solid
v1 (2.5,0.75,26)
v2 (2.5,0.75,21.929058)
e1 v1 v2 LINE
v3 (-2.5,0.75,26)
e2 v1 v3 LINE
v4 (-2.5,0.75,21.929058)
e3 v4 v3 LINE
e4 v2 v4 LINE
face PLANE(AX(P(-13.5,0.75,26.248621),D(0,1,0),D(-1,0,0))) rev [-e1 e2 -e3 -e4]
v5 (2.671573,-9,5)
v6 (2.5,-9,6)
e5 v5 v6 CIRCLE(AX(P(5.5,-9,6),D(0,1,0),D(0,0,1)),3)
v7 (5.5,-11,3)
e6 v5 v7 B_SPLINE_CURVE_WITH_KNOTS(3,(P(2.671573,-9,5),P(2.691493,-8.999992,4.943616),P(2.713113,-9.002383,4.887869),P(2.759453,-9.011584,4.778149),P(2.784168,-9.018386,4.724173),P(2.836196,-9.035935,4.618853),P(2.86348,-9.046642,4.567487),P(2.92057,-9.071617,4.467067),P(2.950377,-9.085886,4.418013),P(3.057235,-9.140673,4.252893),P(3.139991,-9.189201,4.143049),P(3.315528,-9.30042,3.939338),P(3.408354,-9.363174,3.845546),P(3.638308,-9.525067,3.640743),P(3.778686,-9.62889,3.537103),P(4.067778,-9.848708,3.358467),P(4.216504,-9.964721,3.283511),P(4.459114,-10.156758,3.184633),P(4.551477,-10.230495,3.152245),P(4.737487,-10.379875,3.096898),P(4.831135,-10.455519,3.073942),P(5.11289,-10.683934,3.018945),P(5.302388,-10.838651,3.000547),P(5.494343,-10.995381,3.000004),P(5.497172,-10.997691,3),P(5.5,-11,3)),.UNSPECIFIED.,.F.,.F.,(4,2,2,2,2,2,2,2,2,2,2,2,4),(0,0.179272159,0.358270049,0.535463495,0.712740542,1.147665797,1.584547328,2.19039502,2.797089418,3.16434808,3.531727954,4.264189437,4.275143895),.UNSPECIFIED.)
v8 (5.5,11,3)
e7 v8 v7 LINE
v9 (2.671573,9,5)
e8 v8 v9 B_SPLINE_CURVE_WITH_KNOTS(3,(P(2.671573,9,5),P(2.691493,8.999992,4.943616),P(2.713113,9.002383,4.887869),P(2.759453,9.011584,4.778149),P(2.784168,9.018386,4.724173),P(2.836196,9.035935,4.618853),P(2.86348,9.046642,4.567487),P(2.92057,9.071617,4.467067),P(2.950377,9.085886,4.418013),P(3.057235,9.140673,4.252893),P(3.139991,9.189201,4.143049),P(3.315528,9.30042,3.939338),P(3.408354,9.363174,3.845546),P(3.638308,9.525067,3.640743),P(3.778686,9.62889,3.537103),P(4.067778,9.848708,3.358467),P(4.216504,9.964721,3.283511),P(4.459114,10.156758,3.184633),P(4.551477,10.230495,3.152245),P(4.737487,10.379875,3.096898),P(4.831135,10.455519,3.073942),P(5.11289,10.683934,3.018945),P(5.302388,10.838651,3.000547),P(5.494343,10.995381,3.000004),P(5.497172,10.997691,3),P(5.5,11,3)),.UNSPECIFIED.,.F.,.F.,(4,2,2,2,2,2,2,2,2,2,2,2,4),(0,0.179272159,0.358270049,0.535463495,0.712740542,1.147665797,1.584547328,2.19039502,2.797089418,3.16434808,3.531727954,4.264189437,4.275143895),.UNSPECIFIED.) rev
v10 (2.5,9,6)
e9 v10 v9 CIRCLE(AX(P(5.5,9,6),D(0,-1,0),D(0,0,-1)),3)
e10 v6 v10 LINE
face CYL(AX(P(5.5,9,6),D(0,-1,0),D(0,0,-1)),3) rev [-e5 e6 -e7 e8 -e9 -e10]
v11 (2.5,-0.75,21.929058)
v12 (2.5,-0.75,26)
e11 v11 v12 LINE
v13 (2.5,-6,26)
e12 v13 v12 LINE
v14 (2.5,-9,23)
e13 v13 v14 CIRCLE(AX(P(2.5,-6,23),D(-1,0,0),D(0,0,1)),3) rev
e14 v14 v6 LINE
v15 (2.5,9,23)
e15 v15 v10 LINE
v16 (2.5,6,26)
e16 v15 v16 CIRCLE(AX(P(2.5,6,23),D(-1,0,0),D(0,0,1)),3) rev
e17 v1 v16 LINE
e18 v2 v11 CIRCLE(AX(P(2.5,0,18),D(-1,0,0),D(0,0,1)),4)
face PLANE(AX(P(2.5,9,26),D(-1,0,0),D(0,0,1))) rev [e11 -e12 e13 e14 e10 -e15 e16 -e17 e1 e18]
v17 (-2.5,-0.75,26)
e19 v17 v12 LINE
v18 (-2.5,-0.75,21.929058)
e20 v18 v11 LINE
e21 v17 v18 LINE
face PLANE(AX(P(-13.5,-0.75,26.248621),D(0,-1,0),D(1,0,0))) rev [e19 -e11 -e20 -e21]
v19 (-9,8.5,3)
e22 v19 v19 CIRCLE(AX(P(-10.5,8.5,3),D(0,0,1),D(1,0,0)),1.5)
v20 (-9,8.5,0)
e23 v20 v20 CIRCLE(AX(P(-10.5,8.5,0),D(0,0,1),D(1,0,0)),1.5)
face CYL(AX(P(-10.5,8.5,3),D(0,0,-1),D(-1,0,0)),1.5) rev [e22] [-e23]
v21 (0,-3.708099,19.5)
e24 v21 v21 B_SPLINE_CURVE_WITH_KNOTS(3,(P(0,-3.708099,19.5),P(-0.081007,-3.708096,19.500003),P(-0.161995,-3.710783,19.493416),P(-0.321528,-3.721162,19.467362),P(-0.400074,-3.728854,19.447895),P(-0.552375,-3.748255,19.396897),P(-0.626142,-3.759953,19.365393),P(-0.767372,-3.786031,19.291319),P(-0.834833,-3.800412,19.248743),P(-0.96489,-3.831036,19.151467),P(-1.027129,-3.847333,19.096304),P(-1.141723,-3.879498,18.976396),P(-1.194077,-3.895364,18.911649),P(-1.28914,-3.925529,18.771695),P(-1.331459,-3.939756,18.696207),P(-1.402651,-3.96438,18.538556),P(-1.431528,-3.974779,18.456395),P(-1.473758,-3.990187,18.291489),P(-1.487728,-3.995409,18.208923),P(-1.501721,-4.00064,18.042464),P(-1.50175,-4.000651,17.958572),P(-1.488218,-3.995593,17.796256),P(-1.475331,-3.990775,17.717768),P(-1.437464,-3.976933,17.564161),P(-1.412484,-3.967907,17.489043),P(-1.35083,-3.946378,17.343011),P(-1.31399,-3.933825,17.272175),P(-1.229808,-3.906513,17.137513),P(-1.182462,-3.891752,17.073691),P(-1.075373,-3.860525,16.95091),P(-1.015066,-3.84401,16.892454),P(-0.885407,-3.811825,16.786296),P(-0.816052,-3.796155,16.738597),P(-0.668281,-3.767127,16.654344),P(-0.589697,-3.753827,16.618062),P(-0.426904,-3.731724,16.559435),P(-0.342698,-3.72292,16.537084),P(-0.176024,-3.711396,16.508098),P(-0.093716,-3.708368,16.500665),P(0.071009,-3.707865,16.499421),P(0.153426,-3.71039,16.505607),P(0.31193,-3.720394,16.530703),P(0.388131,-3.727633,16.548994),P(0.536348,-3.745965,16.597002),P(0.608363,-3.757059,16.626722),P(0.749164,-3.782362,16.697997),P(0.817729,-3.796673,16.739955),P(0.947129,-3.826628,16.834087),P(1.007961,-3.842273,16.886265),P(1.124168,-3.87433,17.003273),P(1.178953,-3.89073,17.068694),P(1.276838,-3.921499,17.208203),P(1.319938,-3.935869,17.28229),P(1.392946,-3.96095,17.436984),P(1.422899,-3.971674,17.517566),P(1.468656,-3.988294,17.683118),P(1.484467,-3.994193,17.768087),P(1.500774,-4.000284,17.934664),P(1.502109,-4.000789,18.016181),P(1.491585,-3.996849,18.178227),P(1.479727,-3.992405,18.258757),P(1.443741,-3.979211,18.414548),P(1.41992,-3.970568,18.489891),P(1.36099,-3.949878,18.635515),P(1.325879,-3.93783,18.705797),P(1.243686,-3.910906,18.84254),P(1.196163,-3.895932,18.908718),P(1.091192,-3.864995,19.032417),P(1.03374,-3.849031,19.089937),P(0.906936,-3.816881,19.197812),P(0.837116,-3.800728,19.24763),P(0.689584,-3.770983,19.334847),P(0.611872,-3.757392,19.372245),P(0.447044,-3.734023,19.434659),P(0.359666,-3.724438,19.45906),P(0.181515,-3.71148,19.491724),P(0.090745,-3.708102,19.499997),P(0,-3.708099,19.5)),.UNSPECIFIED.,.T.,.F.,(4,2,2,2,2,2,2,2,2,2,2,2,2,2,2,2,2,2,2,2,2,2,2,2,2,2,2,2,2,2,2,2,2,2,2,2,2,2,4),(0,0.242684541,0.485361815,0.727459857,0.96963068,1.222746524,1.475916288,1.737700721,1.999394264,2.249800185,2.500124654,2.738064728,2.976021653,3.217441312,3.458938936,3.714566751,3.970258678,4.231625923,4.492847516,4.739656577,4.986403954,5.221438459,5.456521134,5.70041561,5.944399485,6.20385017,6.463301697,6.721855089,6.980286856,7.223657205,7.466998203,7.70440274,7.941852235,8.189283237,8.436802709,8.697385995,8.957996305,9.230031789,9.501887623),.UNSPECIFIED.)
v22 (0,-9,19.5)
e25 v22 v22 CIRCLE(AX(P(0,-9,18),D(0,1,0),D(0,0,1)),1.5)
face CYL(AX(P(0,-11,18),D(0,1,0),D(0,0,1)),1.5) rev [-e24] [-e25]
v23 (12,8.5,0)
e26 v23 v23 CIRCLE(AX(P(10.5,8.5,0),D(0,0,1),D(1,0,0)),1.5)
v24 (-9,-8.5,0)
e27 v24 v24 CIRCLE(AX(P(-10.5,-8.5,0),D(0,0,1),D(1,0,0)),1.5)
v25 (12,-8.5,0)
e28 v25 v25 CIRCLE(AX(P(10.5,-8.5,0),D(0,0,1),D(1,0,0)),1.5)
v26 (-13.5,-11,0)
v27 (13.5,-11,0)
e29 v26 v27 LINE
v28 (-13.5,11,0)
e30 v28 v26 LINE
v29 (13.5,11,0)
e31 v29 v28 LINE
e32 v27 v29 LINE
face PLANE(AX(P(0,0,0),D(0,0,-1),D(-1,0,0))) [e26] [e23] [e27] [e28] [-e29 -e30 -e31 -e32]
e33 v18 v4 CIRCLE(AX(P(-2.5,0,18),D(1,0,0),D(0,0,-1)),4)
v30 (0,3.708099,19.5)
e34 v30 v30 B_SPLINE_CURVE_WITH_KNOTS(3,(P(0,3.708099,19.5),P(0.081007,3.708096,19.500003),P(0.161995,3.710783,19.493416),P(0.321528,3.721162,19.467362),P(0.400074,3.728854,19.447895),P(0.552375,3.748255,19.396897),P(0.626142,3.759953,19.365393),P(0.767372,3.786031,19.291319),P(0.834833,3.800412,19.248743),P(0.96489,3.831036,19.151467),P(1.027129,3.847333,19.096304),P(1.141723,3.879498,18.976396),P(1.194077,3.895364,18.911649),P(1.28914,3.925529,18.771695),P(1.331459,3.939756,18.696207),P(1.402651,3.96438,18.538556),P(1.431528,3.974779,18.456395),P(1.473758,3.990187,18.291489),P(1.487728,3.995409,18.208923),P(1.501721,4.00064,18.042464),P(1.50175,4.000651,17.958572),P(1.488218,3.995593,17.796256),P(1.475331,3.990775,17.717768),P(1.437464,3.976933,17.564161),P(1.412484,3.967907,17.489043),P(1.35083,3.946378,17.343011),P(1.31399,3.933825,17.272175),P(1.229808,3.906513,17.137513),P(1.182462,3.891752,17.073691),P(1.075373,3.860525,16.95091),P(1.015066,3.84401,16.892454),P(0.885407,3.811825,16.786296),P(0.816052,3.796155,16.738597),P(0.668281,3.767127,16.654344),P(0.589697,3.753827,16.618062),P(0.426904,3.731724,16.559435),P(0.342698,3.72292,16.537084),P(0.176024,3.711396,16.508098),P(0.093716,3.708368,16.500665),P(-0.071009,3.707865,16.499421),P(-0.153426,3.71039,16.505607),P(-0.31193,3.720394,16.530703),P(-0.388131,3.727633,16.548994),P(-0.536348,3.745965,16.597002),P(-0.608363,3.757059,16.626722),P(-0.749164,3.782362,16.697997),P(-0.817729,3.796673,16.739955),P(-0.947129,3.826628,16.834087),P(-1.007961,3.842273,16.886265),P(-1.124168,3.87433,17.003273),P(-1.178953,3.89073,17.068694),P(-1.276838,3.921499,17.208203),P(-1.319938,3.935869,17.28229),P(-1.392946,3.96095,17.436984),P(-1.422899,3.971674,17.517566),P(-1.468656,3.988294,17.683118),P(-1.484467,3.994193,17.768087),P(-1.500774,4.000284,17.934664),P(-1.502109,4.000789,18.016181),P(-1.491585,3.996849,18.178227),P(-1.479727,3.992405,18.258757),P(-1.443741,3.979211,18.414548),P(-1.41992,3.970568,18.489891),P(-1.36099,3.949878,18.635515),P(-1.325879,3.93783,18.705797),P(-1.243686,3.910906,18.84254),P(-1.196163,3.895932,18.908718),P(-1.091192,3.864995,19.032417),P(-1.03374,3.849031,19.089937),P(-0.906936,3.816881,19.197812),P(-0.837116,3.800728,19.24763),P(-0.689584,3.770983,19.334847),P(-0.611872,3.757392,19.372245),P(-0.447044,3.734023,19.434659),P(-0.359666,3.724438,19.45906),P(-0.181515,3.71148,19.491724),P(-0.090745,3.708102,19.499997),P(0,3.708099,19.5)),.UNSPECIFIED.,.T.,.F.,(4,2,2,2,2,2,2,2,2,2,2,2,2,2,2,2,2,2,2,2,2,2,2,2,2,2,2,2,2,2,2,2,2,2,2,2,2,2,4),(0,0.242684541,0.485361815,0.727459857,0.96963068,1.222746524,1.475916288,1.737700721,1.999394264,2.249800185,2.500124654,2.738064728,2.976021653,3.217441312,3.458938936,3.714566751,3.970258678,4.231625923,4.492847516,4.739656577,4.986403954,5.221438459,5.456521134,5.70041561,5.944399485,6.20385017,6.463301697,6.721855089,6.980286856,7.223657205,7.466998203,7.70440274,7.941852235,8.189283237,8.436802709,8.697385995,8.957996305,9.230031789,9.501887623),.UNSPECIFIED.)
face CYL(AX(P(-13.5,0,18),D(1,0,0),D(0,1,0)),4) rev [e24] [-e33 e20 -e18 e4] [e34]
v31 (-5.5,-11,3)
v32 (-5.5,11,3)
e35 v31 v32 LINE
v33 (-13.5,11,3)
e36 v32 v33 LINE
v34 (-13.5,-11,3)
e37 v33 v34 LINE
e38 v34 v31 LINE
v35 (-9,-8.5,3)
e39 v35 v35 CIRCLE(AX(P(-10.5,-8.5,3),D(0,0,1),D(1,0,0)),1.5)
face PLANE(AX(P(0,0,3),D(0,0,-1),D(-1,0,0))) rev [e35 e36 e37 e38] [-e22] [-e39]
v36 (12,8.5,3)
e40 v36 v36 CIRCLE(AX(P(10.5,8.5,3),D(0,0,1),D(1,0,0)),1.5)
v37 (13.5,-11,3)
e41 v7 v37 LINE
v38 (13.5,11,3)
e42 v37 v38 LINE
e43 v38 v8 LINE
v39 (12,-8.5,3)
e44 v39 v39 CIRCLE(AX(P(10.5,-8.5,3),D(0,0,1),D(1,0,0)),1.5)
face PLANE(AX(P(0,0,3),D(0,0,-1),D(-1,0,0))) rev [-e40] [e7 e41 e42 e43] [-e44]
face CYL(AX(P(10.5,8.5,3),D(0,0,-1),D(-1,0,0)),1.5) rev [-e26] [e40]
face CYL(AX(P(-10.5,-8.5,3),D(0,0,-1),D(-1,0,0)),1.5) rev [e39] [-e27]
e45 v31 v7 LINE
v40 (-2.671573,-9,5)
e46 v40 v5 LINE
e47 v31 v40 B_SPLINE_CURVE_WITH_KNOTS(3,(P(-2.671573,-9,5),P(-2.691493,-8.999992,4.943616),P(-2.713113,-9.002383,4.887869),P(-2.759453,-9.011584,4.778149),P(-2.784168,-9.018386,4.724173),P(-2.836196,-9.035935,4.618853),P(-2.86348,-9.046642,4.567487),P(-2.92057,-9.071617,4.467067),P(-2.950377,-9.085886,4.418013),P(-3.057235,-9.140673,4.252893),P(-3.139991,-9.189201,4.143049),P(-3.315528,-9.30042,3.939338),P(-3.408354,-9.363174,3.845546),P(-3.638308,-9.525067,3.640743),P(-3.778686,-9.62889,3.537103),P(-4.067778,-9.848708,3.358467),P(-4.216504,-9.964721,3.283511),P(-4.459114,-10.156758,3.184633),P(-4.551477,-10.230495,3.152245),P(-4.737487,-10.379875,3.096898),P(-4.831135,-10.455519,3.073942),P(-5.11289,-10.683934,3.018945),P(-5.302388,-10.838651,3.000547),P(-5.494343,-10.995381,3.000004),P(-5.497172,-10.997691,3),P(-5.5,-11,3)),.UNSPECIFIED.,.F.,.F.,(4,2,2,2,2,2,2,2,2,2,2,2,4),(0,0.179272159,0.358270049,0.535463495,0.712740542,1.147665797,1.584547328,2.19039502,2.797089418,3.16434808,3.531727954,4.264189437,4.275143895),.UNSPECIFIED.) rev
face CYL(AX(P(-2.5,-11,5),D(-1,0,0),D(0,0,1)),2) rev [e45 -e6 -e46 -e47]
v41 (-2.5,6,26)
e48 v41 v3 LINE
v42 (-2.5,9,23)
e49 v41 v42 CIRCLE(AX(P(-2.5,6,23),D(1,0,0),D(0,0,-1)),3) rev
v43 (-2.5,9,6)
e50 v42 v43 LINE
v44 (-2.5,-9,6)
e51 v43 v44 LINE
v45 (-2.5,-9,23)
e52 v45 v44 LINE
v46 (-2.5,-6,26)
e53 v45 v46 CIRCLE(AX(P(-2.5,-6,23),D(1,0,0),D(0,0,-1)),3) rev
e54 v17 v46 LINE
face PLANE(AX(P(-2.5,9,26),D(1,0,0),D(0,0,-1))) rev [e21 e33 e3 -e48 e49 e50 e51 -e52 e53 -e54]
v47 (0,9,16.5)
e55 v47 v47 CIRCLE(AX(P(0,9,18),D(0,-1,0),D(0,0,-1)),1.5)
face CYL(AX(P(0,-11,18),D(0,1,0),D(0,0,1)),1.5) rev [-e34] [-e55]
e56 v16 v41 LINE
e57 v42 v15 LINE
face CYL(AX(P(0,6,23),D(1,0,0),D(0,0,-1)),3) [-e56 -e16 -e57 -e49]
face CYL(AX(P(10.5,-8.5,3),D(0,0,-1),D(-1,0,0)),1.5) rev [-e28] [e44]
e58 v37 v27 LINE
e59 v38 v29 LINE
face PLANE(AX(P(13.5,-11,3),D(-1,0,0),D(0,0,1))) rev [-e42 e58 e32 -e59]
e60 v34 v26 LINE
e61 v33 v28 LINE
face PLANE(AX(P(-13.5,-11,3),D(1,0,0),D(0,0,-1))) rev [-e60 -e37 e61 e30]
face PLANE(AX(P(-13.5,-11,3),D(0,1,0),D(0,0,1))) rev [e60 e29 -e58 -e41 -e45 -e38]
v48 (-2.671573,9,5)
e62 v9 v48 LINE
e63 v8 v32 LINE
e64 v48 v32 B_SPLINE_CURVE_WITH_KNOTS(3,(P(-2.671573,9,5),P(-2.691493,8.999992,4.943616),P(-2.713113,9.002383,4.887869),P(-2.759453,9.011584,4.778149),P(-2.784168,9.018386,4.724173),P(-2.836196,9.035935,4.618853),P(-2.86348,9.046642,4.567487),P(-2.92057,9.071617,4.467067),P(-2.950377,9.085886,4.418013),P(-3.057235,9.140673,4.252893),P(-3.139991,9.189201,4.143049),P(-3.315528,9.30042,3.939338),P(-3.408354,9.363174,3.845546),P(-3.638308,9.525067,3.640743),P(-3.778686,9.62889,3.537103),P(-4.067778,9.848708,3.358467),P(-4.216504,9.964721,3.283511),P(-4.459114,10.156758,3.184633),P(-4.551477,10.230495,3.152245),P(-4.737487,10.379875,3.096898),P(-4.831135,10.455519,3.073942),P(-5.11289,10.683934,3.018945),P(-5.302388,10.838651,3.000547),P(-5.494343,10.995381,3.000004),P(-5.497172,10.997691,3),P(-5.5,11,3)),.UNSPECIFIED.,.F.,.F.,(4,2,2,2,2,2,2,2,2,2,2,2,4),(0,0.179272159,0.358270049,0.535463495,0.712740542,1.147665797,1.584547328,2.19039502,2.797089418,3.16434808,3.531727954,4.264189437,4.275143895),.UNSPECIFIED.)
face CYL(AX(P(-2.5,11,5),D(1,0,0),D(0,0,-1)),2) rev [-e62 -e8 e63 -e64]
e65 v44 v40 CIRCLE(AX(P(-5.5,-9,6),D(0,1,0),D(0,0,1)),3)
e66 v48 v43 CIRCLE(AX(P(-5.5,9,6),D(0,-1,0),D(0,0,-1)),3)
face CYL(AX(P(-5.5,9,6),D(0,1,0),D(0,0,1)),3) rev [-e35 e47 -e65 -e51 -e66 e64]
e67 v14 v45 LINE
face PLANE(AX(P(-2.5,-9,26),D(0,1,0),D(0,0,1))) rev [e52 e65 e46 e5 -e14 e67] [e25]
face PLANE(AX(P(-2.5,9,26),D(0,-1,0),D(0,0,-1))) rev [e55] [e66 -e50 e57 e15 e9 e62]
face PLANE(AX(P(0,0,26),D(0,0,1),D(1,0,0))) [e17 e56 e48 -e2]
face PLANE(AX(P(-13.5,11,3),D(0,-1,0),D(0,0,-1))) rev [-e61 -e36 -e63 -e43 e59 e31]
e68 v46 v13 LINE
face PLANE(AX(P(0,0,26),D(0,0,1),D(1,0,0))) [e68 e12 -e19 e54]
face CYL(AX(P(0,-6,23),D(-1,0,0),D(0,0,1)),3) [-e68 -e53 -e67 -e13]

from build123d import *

# Parameters (mm, degrees)
SKETCH1_W               = 27
SKETCH1_H               = 22
SKETCH1_R               = 1.5
BOSS_EXTRUDE1_DEPTH     = 3
SKETCH2_W               = 5
SKETCH2_H               = 18
BOSS_EXTRUDE2_DEPTH     = 23
CUT_EXTRUDE1_DEPTH      = 33.449961479
CUT_EXTRUDE1_DEPTH_BACK = 33.449961479
SKETCH3_R               = 4
CUT_EXTRUDE2_DEPTH      = 33.449961479
CUT_EXTRUDE2_DEPTH_BACK = 33.449961479
SKETCH4_W               = 9.515030356
SKETCH4_H               = 1.5
FILLET1_R               = 3
CUT_EXTRUDE3_DEPTH      = 37.636730203
CUT_EXTRUDE3_DEPTH_BACK = 37.636730203
SKETCH5_R               = 1.5
FILLET2_R               = 2
FILLET3_R               = 3


with BuildPart() as part:
    # Sketch1 → Boss-Extrude1 (new body)
    with BuildSketch(Plane.XY):
        Rectangle(SKETCH1_W, SKETCH1_H)
        with Locations((-10.5, -8.5)):
            Circle(SKETCH1_R, mode=Mode.SUBTRACT)
        with Locations((-10.5, 8.5)):
            Circle(SKETCH1_R, mode=Mode.SUBTRACT)
        with Locations((10.5, 8.5)):
            Circle(SKETCH1_R, mode=Mode.SUBTRACT)
        with Locations((10.5, -8.5)):
            Circle(SKETCH1_R, mode=Mode.SUBTRACT)
    extrude(amount=BOSS_EXTRUDE1_DEPTH)

    # Sketch2 → Boss-Extrude2 (add)
    with BuildSketch(Plane.XY.offset(3)):
        Rectangle(SKETCH2_W, SKETCH2_H)
    extrude(amount=BOSS_EXTRUDE2_DEPTH)

    # Sketch3 → Cut-Extrude1 (cut, two sides: drawn at the far end of the back side and taken through both)
    with BuildSketch(Plane(origin=(2.5, 0, 0), x_dir=(0, 0, -1), z_dir=(1, 0, 0)).offset(-CUT_EXTRUDE1_DEPTH_BACK)):
        with Locations(Location((-18, 0, 0), (0, 0, 180))):
            Circle(SKETCH3_R)
    extrude(amount=CUT_EXTRUDE1_DEPTH + CUT_EXTRUDE1_DEPTH_BACK, mode=Mode.SUBTRACT)

    # Sketch4 → Cut-Extrude2 (cut, two sides: drawn at the far end of the back side and taken through both)
    with BuildSketch(Plane(origin=(2.5, 0, 0), x_dir=(0, 0, -1), z_dir=(1, 0, 0)).offset(-CUT_EXTRUDE2_DEPTH_BACK)):
        with Locations((-21.491106051, 0)):
            Rectangle(SKETCH4_W, SKETCH4_H)
    extrude(amount=CUT_EXTRUDE2_DEPTH + CUT_EXTRUDE2_DEPTH_BACK, mode=Mode.SUBTRACT)

    # Fillet1
    fillet1_edges = [part.edges().sort_by_distance(p)[0] for p in [
        (-2.5, 0, 3),
        (2.5, 0, 3),
    ]]
    fillet(fillet1_edges, radius=FILLET1_R)

    # Sketch5 → Cut-Extrude3 (cut, two sides: drawn at the far end of the back side and taken through both)
    with BuildSketch(Plane(origin=(0, 11, 0), x_dir=(1, 0, 0), z_dir=(0, 1, 0)).offset(-CUT_EXTRUDE3_DEPTH_BACK)):
        with Locations(Location((0, -18, 0), (0, 0, 270))):
            Circle(SKETCH5_R)
    extrude(amount=CUT_EXTRUDE3_DEPTH + CUT_EXTRUDE3_DEPTH_BACK, mode=Mode.SUBTRACT)

    # Fillet2
    fillet2_edges = [part.edges().sort_by_distance(p)[0] for p in [
        (0, -9, 3),
        (0, 9, 3),
    ]]
    fillet(fillet2_edges, radius=FILLET2_R - 0.0001)  # a hair under: the kernel refuses the full size

    # Fillet3
    fillet3_edges = [part.edges().sort_by_distance(p)[0] for p in [
        (0, -9, 26),
        (0, 9, 26),
    ]]
    fillet(fillet3_edges, radius=FILLET3_R)


solid = part.part
